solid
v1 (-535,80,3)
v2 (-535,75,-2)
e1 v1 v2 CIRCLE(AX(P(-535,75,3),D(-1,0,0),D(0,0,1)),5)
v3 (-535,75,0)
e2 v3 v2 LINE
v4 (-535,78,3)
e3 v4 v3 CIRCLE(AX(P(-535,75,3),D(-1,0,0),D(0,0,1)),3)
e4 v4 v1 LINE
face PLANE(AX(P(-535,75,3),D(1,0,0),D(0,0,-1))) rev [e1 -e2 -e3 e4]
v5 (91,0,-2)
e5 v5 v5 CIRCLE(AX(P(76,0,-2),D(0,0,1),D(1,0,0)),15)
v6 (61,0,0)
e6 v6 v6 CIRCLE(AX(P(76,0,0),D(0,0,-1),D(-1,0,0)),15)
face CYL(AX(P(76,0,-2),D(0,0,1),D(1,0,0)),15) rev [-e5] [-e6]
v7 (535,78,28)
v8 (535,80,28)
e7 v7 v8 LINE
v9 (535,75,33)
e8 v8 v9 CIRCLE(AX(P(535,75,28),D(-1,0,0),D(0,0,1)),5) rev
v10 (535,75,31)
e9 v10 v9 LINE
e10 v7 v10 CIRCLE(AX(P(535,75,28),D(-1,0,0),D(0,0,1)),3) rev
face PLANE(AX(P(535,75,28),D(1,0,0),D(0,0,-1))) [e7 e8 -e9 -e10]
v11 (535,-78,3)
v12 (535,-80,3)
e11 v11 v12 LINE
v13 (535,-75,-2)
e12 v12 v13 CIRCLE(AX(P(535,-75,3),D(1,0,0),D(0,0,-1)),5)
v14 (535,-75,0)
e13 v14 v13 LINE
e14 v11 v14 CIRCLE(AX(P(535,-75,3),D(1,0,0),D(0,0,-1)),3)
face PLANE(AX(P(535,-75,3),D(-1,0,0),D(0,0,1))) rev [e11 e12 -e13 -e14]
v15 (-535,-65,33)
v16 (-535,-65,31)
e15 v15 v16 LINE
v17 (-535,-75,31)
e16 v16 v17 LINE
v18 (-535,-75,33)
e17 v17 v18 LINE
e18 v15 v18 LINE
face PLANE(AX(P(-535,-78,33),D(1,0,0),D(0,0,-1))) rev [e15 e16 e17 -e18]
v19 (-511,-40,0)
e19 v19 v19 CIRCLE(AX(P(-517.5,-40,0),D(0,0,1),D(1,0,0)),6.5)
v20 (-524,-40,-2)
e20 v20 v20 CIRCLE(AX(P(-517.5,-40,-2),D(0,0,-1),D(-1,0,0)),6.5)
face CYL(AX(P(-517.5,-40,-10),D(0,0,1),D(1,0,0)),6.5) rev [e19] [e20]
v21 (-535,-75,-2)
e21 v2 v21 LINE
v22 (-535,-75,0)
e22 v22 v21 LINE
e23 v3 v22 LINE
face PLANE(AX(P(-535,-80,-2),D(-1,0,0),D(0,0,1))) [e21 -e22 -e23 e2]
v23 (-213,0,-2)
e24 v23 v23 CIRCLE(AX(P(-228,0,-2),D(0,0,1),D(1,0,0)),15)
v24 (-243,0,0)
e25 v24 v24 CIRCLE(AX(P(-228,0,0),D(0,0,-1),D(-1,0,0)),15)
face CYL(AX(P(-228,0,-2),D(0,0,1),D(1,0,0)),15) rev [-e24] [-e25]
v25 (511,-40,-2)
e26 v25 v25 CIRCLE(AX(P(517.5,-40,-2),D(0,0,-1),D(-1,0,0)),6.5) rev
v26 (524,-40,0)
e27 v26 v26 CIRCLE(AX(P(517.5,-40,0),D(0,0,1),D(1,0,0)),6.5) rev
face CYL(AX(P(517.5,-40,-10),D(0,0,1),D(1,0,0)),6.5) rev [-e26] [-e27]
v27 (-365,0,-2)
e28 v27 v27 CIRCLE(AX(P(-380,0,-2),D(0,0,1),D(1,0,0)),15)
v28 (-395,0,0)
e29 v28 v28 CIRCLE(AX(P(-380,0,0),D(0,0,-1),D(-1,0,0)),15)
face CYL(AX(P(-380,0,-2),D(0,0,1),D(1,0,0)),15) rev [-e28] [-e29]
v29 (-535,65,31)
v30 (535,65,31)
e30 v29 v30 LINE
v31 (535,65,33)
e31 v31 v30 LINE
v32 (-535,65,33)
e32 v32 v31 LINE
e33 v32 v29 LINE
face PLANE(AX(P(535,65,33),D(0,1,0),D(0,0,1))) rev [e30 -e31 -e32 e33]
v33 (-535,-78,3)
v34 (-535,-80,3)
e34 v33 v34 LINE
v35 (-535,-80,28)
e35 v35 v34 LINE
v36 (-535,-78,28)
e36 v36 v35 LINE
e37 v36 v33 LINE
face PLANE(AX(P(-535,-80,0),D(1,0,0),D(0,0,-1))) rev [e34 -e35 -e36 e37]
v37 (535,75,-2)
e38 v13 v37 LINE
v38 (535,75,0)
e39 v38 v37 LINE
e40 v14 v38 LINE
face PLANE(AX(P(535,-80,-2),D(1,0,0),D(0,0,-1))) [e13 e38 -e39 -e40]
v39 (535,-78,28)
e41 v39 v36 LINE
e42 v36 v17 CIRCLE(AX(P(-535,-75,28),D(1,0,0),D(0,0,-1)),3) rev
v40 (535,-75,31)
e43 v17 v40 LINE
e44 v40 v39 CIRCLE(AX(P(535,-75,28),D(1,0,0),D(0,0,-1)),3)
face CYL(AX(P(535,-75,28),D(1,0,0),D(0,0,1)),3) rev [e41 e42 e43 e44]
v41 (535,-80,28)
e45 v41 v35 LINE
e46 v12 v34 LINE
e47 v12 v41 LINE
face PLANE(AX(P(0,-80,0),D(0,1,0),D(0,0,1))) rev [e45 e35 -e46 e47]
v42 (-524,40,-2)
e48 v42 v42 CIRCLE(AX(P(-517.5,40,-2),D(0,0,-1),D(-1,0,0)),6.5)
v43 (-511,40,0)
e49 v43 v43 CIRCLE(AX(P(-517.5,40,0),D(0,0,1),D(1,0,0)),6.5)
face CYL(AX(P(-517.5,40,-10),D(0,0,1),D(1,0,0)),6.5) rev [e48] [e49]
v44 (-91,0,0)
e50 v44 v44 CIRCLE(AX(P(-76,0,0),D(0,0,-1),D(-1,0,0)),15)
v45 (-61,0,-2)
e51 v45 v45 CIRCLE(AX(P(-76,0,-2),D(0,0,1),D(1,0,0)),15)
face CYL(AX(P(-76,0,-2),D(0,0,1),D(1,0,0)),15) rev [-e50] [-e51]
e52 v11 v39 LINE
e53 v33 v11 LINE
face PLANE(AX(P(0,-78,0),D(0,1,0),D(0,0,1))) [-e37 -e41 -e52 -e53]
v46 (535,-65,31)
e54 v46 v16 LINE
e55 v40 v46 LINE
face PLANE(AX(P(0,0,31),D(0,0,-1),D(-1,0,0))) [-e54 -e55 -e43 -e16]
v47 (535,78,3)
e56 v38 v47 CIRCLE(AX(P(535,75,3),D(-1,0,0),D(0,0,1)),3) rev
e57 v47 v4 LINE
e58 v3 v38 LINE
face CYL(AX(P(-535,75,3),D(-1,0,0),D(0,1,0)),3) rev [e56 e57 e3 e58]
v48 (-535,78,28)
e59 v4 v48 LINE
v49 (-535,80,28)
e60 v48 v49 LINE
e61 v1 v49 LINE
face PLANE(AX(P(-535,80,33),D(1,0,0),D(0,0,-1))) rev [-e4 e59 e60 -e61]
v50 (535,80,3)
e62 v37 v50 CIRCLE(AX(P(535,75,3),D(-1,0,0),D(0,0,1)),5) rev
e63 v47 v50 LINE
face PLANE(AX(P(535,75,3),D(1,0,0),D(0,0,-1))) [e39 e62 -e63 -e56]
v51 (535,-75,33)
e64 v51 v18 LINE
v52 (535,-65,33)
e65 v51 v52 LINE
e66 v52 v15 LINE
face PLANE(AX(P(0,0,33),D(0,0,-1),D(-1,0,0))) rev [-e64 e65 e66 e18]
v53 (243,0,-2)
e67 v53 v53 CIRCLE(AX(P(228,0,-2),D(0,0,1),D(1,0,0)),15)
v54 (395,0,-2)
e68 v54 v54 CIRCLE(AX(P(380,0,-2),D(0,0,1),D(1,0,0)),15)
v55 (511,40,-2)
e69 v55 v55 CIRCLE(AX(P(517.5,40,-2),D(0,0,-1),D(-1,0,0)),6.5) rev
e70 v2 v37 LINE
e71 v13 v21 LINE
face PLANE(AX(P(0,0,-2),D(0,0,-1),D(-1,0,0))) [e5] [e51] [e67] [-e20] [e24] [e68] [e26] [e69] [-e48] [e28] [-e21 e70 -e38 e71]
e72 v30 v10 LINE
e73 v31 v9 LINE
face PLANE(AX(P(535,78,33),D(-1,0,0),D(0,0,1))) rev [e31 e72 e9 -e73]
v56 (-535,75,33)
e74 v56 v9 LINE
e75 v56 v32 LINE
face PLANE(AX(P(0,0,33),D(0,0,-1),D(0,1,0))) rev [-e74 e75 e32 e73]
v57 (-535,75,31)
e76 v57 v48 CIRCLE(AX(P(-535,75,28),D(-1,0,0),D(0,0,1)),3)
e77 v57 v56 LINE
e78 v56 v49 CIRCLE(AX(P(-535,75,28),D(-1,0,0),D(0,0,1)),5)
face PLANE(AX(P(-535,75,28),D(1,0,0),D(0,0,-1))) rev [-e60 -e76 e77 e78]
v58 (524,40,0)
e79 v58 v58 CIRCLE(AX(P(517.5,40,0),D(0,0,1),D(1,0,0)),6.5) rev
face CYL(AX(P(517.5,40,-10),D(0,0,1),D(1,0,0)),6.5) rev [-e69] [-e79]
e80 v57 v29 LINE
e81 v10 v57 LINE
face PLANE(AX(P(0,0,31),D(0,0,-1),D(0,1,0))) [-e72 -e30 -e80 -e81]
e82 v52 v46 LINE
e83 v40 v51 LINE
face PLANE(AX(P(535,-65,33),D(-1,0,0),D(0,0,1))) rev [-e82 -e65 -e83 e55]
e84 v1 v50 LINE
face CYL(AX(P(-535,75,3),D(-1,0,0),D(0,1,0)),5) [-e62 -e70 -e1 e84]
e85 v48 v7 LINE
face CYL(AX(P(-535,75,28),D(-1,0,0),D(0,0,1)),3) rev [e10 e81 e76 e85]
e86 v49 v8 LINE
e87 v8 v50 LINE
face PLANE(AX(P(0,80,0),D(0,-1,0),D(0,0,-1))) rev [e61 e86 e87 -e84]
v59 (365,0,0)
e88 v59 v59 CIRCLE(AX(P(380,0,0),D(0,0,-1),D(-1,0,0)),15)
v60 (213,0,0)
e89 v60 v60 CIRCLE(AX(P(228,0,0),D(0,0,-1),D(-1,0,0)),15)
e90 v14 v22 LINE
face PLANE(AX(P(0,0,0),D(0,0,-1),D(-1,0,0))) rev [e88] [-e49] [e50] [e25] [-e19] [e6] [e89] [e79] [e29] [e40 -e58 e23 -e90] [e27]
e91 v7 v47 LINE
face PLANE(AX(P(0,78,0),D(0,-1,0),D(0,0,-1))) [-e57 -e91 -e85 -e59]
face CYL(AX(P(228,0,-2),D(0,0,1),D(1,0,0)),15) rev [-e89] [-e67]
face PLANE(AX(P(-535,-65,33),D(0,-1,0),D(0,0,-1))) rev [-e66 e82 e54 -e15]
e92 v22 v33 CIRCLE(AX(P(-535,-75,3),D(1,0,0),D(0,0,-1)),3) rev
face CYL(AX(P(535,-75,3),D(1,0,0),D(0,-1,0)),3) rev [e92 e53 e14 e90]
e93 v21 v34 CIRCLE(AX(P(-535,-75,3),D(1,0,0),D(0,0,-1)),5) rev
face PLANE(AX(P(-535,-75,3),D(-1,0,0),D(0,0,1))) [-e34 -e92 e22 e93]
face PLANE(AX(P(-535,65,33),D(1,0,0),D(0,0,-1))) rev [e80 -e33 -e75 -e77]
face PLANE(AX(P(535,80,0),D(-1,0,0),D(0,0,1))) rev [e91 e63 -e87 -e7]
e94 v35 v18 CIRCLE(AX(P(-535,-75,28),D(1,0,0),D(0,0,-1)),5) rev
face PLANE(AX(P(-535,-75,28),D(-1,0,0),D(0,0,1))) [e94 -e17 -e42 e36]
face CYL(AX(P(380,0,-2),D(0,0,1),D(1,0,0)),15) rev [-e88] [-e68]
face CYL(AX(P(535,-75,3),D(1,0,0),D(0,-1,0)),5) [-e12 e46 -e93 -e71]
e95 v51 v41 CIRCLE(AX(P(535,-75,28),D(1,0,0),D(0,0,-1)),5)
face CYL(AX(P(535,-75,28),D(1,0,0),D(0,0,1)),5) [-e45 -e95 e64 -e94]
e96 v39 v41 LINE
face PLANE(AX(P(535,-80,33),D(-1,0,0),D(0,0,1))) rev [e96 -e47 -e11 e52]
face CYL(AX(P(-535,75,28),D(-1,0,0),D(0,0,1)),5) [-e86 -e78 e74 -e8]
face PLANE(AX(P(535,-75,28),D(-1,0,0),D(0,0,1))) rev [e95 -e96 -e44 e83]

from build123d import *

# Parameters (mm, degrees)
SKETCH1_W                      = 1070
SKETCH1_H                      = 160
BASE_FLANGE1_DEPTH             = 2
EDGE_FLANGE1_STRIP_W           = 14
EDGE_FLANGE1_STRIP_H           = 2
EDGE_FLANGE1_STRIP_CUT_DEPTH   = 1070
EDGE_FLANGE1_STRIP_2_W         = 14
EDGE_FLANGE1_STRIP_2_H         = 2
EDGE_FLANGE1_STRIP_CUT_2_DEPTH = 1070
EDGE_FLANGE1_DEPTH             = 1070
EDGE_FLANGE1_BEND_DEPTH        = 1070
EDGE_FLANGE2_STRIP_W           = 14
EDGE_FLANGE2_STRIP_H           = 2
EDGE_FLANGE2_STRIP_CUT_DEPTH   = 1070
EDGE_FLANGE2_STRIP_2_W         = 14
EDGE_FLANGE2_STRIP_2_H         = 2
EDGE_FLANGE2_STRIP_CUT_2_DEPTH = 1070
EDGE_FLANGE2_DEPTH             = 1070
EDGE_FLANGE2_BEND_DEPTH        = 1070
SKETCH18_R                     = 6.5
CUT_EXTRUDE1_DEPTH             = 10
SKETCH19_R                     = 15
CUT_EXTRUDE2_DEPTH             = 542.953872576
LPATTERN1_COUNT                = 6
LPATTERN1_PITCH                = 152


# Sheet-metal steps are written as plain solids
with BuildPart() as part:
    # Sketch1 → Base-Flange1 (new body)
    with BuildSketch(Plane.XY):
        Rectangle(SKETCH1_W, SKETCH1_H)
    extrude(amount=-BASE_FLANGE1_DEPTH)

    # Edge-Flange1 strip (across the edge) → Edge-Flange1 strip cut (cut)
    with BuildSketch(Plane(origin=(535, 80, 0), x_dir=(0, -1, 0), z_dir=(-1, 0, 0))):
        with Locations((-2, -1)):
            Rectangle(EDGE_FLANGE1_STRIP_W, EDGE_FLANGE1_STRIP_H)
    extrude(amount=EDGE_FLANGE1_STRIP_CUT_DEPTH, mode=Mode.SUBTRACT)

    # Edge-Flange1 strip 2 (across the edge) → Edge-Flange1 strip cut 2 (cut)
    with BuildSketch(Plane(origin=(-535, -80, 0), x_dir=(0, 1, 0), z_dir=(1, 0, 0))):
        with Locations((-2, -1)):
            Rectangle(EDGE_FLANGE1_STRIP_2_W, EDGE_FLANGE1_STRIP_2_H)
    extrude(amount=EDGE_FLANGE1_STRIP_CUT_2_DEPTH, mode=Mode.SUBTRACT)

    # Edge-Flange1 section (across the edge) → Edge-Flange1 (add)
    with BuildSketch(Plane(origin=(535, 80, 0), x_dir=(0, -1, 0), z_dir=(-1, 0, 0))):
        with BuildLine():
            Line((0, 3), (0, 33))
            Line((0, 33), (2, 33))
            Line((2, 33), (2, 3))
            ThreePointArc((2, 3), (2.878679656, 0.878679656), (5, 0))
            Line((5, 0), (5, -2))
            ThreePointArc((5, -2), (1.464466094, -0.535533906), (0, 3))
        make_face()
    extrude(amount=EDGE_FLANGE1_DEPTH)

    # Edge-Flange1 section 2 (across the edge) → Edge-Flange1 bend (add)
    with BuildSketch(Plane(origin=(-535, -80, 0), x_dir=(0, 1, 0), z_dir=(1, 0, 0))):
        with BuildLine():
            Line((0, 3), (0, 33))
            Line((0, 33), (2, 33))
            Line((2, 33), (2, 3))
            ThreePointArc((2, 3), (2.878679656, 0.878679656), (5, 0))
            Line((5, 0), (5, -2))
            ThreePointArc((5, -2), (1.464466094, -0.535533906), (0, 3))
        make_face()
    extrude(amount=EDGE_FLANGE1_BEND_DEPTH)

    # Edge-Flange2 strip (across the edge) → Edge-Flange2 strip cut (cut)
    with BuildSketch(Plane(origin=(-535, -78, 33), x_dir=(0, 0, -1), z_dir=(1, 0, 0))):
        with Locations((-2, -1)):
            Rectangle(EDGE_FLANGE2_STRIP_W, EDGE_FLANGE2_STRIP_H)
    extrude(amount=EDGE_FLANGE2_STRIP_CUT_DEPTH, mode=Mode.SUBTRACT)

    # Edge-Flange2 strip 2 (across the edge) → Edge-Flange2 strip cut 2 (cut)
    with BuildSketch(Plane(origin=(535, 78, 33), x_dir=(0, 0, -1), z_dir=(-1, 0, 0))):
        with Locations((-2, -1)):
            Rectangle(EDGE_FLANGE2_STRIP_2_W, EDGE_FLANGE2_STRIP_2_H)
    extrude(amount=EDGE_FLANGE2_STRIP_CUT_2_DEPTH, mode=Mode.SUBTRACT)

    # Edge-Flange2 section (across the edge) → Edge-Flange2 (add)
    with BuildSketch(Plane(origin=(-535, -78, 33), x_dir=(0, 0, -1), z_dir=(1, 0, 0))):
        with BuildLine():
            Line((0, 3), (0, 13))
            Line((0, 13), (2, 13))
            Line((2, 13), (2, 3))
            ThreePointArc((2, 3), (2.878679656, 0.878679656), (5, 0))
            Line((5, 0), (5, -2))
            ThreePointArc((5, -2), (1.464466094, -0.535533906), (0, 3))
        make_face()
    extrude(amount=EDGE_FLANGE2_DEPTH)

    # Edge-Flange2 section 2 (across the edge) → Edge-Flange2 bend (add)
    with BuildSketch(Plane(origin=(535, 78, 33), x_dir=(0, 0, -1), z_dir=(-1, 0, 0))):
        with BuildLine():
            Line((0, 3), (0, 13))
            Line((0, 13), (2, 13))
            Line((2, 13), (2, 3))
            ThreePointArc((2, 3), (2.878679656, 0.878679656), (5, 0))
            Line((5, 0), (5, -2))
            ThreePointArc((5, -2), (1.464466094, -0.535533906), (0, 3))
        make_face()
    extrude(amount=EDGE_FLANGE2_BEND_DEPTH)

    # Sketch18 → Cut-Extrude1 (cut)
    with BuildSketch(Plane.XY):
        with Locations((-517.5, 40)):
            Circle(SKETCH18_R)
        with Locations((-517.5, -40)):
            Circle(SKETCH18_R)
        with Locations((517.5, -40)):
            Circle(SKETCH18_R)
        with Locations((517.5, 40)):
            Circle(SKETCH18_R)
    extrude(amount=-CUT_EXTRUDE1_DEPTH, mode=Mode.SUBTRACT)

    # Sketch19 → Cut-Extrude2 (cut, symmetric)
    with BuildSketch(Plane.XY):
        with Locations((380, 0)):
            Circle(SKETCH19_R)
    cut_extrude2 = extrude(amount=CUT_EXTRUDE2_DEPTH, both=True, mode=Mode.SUBTRACT)

    # LPattern1: Cut-Extrude2 ×6
    with Locations(*[(-i * LPATTERN1_PITCH, 0, 0) for i in range(1, LPATTERN1_COUNT)]):
        add(cut_extrude2, mode=Mode.SUBTRACT)


solid = part.part
